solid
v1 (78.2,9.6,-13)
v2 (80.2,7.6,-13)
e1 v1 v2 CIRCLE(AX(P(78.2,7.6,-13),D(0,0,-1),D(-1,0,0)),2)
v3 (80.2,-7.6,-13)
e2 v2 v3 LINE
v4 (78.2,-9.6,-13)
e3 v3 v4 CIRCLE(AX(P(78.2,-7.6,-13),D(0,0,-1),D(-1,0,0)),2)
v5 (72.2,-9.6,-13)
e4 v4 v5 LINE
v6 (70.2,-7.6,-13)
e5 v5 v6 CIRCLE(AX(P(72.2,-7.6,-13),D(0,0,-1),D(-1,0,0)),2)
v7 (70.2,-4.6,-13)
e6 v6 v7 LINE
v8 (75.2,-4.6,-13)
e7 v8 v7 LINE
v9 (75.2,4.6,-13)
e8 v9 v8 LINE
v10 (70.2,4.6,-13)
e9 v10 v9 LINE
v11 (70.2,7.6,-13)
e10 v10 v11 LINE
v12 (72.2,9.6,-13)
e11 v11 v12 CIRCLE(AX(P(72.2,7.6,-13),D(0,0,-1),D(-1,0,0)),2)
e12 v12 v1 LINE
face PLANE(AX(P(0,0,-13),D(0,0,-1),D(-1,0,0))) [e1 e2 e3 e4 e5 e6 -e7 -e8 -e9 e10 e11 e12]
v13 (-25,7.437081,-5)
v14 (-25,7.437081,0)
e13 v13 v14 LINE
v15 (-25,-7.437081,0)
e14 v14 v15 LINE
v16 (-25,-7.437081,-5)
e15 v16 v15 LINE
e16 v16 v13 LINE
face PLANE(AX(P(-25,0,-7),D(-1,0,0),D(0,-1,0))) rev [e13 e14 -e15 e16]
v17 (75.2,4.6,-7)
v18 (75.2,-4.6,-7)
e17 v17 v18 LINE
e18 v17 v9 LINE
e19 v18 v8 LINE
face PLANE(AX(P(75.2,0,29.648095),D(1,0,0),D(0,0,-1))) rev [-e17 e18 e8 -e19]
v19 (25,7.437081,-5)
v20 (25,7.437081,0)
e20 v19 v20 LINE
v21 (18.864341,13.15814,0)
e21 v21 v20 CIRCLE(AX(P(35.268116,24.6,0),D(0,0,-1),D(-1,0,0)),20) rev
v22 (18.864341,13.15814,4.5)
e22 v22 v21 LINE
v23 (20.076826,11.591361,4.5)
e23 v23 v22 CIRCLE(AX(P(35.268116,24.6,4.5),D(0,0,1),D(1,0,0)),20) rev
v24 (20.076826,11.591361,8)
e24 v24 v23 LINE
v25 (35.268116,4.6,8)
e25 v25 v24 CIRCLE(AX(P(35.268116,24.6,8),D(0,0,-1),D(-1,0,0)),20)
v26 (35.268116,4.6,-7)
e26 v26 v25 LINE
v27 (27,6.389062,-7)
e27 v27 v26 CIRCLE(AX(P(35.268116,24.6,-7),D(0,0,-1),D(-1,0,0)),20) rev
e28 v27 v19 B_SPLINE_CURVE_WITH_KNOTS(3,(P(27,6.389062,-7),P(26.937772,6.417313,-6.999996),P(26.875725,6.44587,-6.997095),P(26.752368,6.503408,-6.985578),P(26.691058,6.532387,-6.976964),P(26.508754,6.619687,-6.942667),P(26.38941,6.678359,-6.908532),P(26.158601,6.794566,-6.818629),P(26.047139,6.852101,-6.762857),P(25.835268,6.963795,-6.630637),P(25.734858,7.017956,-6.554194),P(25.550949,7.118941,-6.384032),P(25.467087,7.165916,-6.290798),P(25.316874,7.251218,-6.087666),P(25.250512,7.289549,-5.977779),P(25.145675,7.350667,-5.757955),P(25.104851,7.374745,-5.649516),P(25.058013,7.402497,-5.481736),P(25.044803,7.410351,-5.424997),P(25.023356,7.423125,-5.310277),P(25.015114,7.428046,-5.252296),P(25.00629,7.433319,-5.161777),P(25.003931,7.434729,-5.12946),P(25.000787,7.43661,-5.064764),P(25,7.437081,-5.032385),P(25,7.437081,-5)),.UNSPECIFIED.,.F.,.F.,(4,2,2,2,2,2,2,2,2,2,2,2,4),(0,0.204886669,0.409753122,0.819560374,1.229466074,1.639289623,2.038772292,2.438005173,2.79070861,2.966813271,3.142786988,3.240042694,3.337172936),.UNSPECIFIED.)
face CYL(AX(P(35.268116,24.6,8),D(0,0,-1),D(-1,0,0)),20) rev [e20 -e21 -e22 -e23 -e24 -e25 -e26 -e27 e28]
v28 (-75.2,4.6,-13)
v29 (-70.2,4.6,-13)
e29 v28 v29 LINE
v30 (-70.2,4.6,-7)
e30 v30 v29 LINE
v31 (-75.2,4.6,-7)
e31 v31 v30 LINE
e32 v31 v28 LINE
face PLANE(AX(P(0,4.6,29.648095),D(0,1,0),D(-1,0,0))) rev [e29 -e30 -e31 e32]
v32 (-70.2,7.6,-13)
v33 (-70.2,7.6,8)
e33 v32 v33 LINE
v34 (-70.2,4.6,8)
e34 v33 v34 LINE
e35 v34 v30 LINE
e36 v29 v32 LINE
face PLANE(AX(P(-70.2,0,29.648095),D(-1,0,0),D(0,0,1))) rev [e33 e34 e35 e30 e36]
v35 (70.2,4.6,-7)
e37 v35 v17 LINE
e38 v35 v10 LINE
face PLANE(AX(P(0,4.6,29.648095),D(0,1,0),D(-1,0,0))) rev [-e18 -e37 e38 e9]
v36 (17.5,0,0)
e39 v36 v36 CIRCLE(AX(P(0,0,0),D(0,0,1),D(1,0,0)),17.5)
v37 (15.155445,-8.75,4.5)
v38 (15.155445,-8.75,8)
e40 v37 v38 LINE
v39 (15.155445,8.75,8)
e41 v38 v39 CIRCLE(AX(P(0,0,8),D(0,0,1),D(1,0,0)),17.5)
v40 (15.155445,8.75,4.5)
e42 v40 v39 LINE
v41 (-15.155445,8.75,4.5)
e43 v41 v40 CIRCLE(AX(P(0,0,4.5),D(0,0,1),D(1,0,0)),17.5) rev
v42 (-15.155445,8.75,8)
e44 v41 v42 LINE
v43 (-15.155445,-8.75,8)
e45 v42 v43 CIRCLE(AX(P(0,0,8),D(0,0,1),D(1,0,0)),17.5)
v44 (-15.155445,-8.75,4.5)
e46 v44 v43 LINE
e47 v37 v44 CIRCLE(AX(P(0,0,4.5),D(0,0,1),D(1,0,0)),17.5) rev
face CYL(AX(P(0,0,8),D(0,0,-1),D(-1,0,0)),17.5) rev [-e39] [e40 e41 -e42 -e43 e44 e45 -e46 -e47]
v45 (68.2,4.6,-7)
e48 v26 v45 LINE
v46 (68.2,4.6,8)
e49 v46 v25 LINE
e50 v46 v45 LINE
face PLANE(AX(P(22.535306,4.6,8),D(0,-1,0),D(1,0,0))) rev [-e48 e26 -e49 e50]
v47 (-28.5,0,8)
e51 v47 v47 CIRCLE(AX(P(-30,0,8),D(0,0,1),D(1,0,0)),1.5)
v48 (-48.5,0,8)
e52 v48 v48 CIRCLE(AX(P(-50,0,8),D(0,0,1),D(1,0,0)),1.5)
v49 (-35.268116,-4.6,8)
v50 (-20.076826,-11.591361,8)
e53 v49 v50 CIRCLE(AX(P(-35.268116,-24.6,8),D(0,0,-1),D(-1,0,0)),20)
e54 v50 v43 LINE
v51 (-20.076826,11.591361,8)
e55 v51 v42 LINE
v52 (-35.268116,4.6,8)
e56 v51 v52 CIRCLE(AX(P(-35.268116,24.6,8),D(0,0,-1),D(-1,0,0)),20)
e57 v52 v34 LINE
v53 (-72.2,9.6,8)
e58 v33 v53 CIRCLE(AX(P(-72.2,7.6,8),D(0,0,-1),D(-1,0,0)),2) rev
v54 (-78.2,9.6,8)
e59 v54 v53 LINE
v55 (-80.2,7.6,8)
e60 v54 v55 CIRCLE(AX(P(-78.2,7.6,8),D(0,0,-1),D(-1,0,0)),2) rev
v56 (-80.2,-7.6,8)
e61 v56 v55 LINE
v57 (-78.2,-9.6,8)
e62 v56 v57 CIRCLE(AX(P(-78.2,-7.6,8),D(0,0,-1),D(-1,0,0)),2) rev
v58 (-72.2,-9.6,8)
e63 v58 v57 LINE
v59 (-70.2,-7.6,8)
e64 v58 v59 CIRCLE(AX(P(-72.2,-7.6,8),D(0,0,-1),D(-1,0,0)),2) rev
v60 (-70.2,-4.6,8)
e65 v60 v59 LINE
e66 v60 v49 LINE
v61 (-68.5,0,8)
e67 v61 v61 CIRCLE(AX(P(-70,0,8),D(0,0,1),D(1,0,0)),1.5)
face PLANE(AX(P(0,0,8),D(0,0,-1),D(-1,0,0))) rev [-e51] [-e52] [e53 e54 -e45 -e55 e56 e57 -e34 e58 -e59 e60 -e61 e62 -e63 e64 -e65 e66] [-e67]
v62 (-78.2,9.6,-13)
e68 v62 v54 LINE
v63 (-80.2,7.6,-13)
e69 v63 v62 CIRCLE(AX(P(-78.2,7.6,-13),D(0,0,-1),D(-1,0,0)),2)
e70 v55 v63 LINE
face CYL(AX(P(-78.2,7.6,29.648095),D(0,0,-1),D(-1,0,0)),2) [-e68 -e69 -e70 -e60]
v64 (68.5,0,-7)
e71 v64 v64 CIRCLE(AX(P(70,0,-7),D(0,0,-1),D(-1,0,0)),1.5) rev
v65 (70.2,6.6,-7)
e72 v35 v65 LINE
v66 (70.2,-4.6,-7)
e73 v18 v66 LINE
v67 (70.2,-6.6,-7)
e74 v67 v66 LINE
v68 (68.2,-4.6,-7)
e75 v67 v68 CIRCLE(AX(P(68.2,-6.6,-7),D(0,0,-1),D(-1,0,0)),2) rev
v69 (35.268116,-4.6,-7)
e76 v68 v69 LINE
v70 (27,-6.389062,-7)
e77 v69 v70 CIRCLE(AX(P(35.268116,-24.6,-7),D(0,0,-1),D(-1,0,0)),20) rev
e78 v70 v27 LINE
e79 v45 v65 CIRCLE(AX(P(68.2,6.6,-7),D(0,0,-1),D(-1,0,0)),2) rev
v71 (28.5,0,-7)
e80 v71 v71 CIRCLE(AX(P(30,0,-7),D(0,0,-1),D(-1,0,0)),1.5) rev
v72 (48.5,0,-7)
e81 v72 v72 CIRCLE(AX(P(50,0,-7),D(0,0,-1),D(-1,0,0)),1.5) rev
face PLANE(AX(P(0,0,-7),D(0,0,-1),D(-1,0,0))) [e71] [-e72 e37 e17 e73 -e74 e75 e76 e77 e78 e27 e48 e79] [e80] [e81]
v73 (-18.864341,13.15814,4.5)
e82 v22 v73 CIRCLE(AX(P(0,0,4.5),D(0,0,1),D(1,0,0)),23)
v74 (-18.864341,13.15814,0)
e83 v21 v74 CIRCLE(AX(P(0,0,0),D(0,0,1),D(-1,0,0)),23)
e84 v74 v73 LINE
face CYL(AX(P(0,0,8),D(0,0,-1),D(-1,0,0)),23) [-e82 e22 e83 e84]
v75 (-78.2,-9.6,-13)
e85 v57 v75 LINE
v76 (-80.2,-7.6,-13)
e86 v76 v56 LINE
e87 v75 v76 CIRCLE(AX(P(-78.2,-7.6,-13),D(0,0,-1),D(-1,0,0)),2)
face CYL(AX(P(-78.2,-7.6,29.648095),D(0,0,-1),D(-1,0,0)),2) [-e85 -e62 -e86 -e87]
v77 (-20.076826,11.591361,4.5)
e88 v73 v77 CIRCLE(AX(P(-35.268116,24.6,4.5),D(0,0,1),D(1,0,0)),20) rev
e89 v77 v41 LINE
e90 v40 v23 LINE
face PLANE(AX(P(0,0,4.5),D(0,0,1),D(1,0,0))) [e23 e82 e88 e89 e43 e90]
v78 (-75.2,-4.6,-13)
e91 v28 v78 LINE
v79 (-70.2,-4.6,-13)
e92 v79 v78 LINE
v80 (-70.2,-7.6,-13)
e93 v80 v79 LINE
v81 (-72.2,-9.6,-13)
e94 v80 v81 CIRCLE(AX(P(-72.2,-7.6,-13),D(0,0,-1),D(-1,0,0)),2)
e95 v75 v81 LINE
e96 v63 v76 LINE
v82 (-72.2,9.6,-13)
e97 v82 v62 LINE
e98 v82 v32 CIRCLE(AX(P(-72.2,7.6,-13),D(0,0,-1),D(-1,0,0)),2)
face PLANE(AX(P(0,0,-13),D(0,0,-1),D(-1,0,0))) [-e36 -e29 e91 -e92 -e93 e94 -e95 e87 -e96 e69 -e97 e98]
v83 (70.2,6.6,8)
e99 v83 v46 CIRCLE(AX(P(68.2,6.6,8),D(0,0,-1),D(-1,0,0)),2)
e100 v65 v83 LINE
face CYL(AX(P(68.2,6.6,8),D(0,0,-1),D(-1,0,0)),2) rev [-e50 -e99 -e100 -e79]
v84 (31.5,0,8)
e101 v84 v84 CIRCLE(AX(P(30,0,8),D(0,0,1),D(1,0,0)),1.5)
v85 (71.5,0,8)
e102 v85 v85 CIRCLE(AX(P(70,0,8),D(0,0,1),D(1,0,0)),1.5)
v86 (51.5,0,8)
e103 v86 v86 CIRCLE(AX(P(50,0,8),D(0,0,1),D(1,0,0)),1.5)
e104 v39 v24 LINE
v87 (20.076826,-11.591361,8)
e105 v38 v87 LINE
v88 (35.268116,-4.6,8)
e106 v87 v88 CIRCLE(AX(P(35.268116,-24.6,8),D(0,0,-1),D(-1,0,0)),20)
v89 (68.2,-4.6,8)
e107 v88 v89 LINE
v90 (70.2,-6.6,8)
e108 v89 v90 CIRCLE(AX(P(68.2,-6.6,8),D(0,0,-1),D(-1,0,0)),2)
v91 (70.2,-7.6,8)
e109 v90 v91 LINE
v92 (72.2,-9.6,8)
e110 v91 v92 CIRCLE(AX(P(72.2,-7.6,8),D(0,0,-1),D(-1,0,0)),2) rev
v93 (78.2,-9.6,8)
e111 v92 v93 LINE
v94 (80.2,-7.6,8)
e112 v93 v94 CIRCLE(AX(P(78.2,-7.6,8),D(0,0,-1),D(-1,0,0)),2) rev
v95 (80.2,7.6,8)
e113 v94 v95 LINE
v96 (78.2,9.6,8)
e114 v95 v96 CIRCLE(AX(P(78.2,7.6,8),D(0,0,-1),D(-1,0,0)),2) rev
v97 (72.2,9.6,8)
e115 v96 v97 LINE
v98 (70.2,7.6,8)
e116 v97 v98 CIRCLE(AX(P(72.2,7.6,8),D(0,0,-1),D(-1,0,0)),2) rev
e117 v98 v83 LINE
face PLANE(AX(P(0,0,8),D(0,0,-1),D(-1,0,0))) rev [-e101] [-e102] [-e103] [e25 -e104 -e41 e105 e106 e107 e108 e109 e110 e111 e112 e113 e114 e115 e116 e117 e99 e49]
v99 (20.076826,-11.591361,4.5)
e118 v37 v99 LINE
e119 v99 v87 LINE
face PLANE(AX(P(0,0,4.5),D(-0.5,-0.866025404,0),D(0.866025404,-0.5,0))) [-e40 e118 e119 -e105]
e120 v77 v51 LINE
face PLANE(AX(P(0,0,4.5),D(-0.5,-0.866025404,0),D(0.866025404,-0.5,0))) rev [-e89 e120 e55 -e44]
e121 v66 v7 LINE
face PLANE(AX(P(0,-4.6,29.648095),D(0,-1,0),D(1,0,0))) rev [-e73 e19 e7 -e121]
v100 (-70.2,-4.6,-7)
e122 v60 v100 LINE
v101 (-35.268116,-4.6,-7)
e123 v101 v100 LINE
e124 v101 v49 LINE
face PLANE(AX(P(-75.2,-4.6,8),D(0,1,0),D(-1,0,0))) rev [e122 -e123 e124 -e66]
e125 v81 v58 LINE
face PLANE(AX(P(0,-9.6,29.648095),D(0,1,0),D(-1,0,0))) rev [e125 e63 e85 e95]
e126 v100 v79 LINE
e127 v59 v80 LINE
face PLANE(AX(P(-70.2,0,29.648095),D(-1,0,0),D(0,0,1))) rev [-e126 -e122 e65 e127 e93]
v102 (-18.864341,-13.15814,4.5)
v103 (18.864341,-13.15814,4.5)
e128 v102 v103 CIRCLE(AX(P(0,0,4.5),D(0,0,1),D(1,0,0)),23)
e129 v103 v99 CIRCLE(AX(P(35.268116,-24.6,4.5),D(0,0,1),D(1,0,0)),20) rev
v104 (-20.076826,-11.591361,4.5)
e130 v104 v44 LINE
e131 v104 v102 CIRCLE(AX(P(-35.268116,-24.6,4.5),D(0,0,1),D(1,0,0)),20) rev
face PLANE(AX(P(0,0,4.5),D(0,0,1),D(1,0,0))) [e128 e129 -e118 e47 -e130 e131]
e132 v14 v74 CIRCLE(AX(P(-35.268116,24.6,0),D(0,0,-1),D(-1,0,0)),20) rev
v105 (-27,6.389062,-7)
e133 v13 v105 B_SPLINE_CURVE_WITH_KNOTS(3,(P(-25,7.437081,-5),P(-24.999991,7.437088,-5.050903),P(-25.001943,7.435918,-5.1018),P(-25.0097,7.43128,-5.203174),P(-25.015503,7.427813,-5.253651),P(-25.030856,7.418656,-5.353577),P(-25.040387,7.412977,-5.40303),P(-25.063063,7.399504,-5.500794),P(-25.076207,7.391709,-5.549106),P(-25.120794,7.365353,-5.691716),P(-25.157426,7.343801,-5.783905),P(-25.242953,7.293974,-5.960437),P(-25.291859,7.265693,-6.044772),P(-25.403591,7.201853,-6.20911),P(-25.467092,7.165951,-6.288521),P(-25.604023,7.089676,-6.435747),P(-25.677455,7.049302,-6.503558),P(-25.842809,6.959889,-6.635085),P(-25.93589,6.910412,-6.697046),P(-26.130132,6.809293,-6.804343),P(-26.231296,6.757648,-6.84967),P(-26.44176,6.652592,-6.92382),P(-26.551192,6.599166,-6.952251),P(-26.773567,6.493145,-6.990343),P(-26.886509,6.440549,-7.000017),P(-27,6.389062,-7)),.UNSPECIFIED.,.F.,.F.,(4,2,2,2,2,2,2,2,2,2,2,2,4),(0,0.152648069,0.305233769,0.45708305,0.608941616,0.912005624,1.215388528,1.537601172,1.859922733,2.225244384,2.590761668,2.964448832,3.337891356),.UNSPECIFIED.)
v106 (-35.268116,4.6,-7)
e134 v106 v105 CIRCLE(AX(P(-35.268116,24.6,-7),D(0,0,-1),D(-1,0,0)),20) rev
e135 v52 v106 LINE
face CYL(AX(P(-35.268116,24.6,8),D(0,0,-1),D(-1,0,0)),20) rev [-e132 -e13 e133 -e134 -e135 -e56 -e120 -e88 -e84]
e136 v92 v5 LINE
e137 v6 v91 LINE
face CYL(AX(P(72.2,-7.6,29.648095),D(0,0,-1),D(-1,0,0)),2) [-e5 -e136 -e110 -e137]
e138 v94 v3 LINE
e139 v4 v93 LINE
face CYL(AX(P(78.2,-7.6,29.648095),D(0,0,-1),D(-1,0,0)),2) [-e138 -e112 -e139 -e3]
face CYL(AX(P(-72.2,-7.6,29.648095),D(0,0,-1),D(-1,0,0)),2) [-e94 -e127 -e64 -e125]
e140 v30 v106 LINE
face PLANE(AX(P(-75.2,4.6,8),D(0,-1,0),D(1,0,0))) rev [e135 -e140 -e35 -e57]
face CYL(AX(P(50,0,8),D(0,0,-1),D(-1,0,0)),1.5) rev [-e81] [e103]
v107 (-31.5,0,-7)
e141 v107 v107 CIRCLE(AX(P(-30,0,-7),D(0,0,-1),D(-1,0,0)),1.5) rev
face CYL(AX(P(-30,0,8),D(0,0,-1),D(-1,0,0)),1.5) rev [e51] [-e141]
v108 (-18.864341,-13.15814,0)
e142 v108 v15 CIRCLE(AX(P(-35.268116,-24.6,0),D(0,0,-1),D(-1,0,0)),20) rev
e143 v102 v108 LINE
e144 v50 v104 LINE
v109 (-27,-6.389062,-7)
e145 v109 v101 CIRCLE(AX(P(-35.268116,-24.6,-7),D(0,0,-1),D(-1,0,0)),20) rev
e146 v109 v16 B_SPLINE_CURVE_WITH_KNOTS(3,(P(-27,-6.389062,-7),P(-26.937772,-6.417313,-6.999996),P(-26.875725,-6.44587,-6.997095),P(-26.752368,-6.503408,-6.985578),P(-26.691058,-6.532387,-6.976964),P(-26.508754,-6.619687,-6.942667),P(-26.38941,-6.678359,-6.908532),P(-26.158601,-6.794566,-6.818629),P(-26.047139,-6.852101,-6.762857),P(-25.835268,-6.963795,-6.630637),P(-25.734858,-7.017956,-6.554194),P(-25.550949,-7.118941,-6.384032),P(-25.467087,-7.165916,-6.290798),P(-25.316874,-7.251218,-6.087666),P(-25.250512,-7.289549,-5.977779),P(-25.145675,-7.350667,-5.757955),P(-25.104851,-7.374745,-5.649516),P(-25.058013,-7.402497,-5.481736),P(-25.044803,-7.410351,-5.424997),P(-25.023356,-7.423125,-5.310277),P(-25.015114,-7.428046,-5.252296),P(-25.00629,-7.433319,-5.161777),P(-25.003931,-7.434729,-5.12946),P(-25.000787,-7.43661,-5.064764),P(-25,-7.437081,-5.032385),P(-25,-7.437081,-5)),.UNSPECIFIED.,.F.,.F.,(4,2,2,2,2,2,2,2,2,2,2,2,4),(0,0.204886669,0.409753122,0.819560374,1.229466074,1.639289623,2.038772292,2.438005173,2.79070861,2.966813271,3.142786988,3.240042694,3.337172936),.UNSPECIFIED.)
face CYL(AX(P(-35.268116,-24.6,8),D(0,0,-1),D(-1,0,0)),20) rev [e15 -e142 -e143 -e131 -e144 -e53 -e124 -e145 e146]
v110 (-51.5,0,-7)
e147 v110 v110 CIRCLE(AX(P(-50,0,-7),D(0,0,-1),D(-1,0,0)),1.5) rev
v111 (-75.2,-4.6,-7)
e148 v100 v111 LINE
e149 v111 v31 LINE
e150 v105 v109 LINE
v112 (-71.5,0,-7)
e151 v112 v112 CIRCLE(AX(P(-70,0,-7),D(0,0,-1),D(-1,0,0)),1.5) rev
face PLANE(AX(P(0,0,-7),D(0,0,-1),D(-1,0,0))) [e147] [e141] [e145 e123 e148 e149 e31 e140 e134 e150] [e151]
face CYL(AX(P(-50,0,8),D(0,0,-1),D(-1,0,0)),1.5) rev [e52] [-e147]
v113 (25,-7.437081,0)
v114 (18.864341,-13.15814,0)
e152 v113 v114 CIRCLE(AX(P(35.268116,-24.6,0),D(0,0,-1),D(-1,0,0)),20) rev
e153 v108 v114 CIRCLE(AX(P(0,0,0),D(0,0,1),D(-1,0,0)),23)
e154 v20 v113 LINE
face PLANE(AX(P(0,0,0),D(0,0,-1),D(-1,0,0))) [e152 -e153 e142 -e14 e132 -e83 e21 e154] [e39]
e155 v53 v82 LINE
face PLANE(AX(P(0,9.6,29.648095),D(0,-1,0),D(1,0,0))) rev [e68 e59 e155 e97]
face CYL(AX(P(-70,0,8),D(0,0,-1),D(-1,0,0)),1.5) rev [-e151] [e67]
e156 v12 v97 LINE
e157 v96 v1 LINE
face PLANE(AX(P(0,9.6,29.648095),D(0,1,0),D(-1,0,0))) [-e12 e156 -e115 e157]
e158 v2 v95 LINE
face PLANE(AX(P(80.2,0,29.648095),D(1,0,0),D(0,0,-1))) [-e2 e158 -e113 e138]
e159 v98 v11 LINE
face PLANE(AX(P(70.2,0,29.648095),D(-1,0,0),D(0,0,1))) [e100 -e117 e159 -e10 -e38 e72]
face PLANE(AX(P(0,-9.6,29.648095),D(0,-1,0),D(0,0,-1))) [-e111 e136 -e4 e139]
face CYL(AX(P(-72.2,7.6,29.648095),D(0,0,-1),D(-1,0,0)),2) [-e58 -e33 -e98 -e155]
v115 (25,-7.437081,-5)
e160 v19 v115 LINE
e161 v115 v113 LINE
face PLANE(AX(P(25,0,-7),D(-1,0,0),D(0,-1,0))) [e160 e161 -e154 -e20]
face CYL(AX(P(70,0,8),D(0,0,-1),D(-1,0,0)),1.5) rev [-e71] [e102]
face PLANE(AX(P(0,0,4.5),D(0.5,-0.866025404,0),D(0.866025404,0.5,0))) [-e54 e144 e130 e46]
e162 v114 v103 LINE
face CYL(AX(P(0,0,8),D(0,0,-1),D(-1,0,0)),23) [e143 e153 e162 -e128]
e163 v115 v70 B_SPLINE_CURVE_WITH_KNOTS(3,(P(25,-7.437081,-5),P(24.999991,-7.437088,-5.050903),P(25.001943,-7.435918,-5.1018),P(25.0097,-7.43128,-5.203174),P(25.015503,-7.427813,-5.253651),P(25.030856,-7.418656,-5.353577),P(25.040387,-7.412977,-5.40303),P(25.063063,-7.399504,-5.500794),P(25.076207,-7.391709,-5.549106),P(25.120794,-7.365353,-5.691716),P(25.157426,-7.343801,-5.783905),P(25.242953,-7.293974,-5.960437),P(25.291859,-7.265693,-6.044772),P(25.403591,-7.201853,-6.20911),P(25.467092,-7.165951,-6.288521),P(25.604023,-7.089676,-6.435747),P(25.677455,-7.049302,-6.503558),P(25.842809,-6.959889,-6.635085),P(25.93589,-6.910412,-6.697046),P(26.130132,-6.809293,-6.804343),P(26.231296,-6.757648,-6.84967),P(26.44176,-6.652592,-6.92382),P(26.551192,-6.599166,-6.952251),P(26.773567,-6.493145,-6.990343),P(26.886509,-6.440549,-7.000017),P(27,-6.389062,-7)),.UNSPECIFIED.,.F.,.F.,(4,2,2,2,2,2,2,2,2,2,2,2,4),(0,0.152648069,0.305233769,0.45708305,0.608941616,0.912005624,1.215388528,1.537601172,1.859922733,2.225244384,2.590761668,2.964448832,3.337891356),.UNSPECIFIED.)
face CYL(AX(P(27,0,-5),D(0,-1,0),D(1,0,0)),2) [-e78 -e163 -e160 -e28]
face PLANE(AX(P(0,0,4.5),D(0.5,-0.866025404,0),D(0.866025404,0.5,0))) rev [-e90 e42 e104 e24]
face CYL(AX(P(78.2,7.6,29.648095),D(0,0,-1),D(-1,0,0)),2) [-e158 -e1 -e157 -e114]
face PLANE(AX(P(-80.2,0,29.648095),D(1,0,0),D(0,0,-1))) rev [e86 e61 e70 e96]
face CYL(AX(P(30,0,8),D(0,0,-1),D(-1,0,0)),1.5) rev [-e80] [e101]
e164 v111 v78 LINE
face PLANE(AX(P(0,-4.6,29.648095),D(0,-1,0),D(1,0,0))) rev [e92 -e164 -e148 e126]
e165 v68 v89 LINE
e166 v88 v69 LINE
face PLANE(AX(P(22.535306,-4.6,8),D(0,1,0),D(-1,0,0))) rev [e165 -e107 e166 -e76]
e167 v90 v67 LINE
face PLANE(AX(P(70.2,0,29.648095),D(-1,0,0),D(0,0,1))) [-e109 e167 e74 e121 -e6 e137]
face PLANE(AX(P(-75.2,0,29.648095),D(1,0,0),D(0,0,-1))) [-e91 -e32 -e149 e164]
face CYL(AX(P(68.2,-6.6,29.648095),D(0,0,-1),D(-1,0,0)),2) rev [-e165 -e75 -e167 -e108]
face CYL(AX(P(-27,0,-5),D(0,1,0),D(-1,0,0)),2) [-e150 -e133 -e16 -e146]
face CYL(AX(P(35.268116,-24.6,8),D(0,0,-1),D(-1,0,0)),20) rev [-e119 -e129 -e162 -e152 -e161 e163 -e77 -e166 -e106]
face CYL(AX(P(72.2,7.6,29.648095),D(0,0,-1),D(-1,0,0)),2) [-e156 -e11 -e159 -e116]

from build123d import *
from build123d.topology import SkipClean

# Parameters (mm, degrees)
SKETCH_1_R                  = 17.500000000000004
SKETCH_1_R_2                = 1.4999999999999971
SKETCH_1_R_3                = 1.4999999999999967
SKETCH_1_R_4                = 1.499999999999997
EXTRUDE_1_DEPTH             = 8
CUT_EXTRUDE_START           = -3.5
CUT_EXTRUDE_1_DEPTH         = 3.5
FILLET_1_R                  = 20
EXTRUDE_START               = 7
SKETCH_3_R                  = 1.499999999999997
SKETCH_3_R_2                = 1.4999999999999967
SKETCH_3_R_3                = 1.4999999999999971
EXTRUDE_2_DEPTH             = 7
EXTRUDE_3_DEPTH             = 6
EXTRUDE_3_DIRECTION_2_REACH = 82.056
FILLET_2_R                  = 2


with BuildPart() as part:
    # Sketch 1 → 凸台-拉伸1 (new body)
    with BuildSketch(Plane.XY):
        with BuildLine():
            Line((22.535305633605237, 4.6), (75.19999999999999, 4.599999999999999))
            Line((75.19999999999999, 4.599999999999999), (75.19999999999999, -4.6000000000000005))
            Line((75.19999999999999, -4.6000000000000005), (22.535305633605237, -4.6))
            ThreePointArc((22.535305633605237, -4.6), (1.41e-15, -23), (-22.535305633605237, -4.6))
            Line((-22.535305633605237, -4.6), (-75.19999999999999, -4.6000000000000005))
            Line((-75.19999999999999, -4.6000000000000005), (-75.19999999999999, 4.599999999999999))
            Line((-75.19999999999999, 4.599999999999999), (-22.535305633605237, 4.6))
            ThreePointArc((-22.535305633605237, 4.6), (1.41e-15, 23), (22.535305633605237, 4.6))
        make_face()
        Circle(SKETCH_1_R, mode=Mode.SUBTRACT)
        with Locations((-69.99999999999999, 0)):
            Circle(SKETCH_1_R_2, mode=Mode.SUBTRACT)
        with Locations((-49.999999999999986, 0)):
            Circle(SKETCH_1_R_3, mode=Mode.SUBTRACT)
        with Locations((-29.999999999999986, 0)):
            Circle(SKETCH_1_R_4, mode=Mode.SUBTRACT)
        with Locations((30.00000000000003, 0)):
            Circle(SKETCH_1_R_3, mode=Mode.SUBTRACT)
        with Locations((50.00000000000003, 0)):
            Circle(SKETCH_1_R_3, mode=Mode.SUBTRACT)
        with Locations((70.00000000000001, 0)):
            Circle(SKETCH_1_R_2, mode=Mode.SUBTRACT)
    extrude(amount=EXTRUDE_1_DEPTH)

    # 草图2 → 切除-拉伸1 (cut)
    with BuildSketch(Plane.XY.offset(8).offset(CUT_EXTRUDE_START)):
        with BuildLine():
            ThreePointArc((19.918584287042115, 11.499999999999945), (8.9e-16, 23), (-19.91858428704211, 11.499999999999947))
            Line((-19.918584287042115, 11.499999999999943), (-15.155444566227704, 8.749999999999961))
            ThreePointArc((-15.15544456622793, 8.74999999999957), (1.07e-15, 17.500000000000004), (15.15544456622793, 8.749999999999568))
            Line((15.155444566227706, 8.749999999999966), (19.918584287042123, 11.499999999999952))
        make_face()
        with BuildLine():
            ThreePointArc((15.155444566227922, -8.749999999999579), (-3.21e-15, -17.500000000000004), (-15.155444566227935, -8.74999999999956))
            Line((-15.155444566227704, -8.749999999999961), (-19.918584287042123, -11.499999999999947))
            ThreePointArc((-19.918584287042123, -11.499999999999943), (-2.66e-15, -23), (19.918584287042115, -11.49999999999995))
            Line((19.918584287042123, -11.499999999999952), (15.155444566227702, -8.749999999999964))
        make_face()
    extrude(amount=CUT_EXTRUDE_1_DEPTH, mode=Mode.SUBTRACT)

    # 圆角1
    fillet_1_edges = [part.edges().sort_by_distance(p)[0] for p in [
        (-22.53530563360524, -4.600000000000001, 4),
        (-22.53530563360524, 4.6, 4),
        (22.53530563360524, -4.6, 4),
        (22.53530563360524, 4.600000000000001, 4),
    ]]
    fillet(fillet_1_edges, radius=FILLET_1_R)

    # 草图3 → 凸台-拉伸2 (add)
    # profile 1 of 2: a face of its own
    with SkipClean():  # the faces are left unmerged after this step: merging them gives an invalid solid
        with BuildSketch(Plane(origin=(0, 0, 0), x_dir=(-1, 0, 0), z_dir=(0, 0, -1)).offset(EXTRUDE_START)):
            with BuildLine():
                ThreePointArc((35.26811591225139, 4.599999999999994), (29.94169047325186, 5.3223136231865595), (25.00000000000001, 7.437080795722139))
                Line((25.000000000000014, 7.437080795722148), (25.000000000000007, -7.437080795722132))
                ThreePointArc((25.00000000000001, -7.437080795722135), (29.94169047325186, -5.3223136231865595), (35.26811591225139, -4.600000000000005))
                Line((35.26811591225139, -4.600000000000003), (75.19999999999999, -4.6000000000000005))
                Line((75.19999999999999, -4.6000000000000005), (75.19999999999999, 4.599999999999999))
                Line((75.19999999999999, 4.599999999999999), (35.26811591225139, 4.6))
            make_face()
            with Locations((29.999999999999986, 0)):
                Circle(SKETCH_3_R, mode=Mode.SUBTRACT)
            with Locations((49.999999999999986, 0)):
                Circle(SKETCH_3_R_2, mode=Mode.SUBTRACT)
            with Locations((69.99999999999999, 0)):
                Circle(SKETCH_3_R_3, mode=Mode.SUBTRACT)
        # profile 2 of 2: a face of its own
        with BuildSketch(Plane(origin=(0, 0, 0), x_dir=(-1, 0, 0), z_dir=(0, 0, -1)).offset(EXTRUDE_START)):
            with BuildLine():
                Line((-25, -7.437080795722138), (-25.000000000000007, 7.437080795722141))
                ThreePointArc((-25.000000000000004, 7.437080795722139), (-29.94169047325186, 5.322313623186556), (-35.268115912251396, 4.600000000000001))
                Line((-35.268115912251396, 4.600000000000003), (-75.19999999999999, 4.599999999999999))
                Line((-75.19999999999999, 4.599999999999999), (-75.19999999999999, -4.6000000000000005))
                Line((-75.19999999999999, -4.6000000000000005), (-35.26811591225139, -4.6))
                ThreePointArc((-35.26811591225139, -4.600000000000001), (-29.941690473251857, -5.3223136231865595), (-25.000000000000004, -7.437080795722142))
            make_face()
            with Locations((-70.00000000000001, 0)):
                Circle(SKETCH_3_R_3, mode=Mode.SUBTRACT)
            with Locations((-50.00000000000003, 0)):
                Circle(SKETCH_3_R_2, mode=Mode.SUBTRACT)
            with Locations((-30.00000000000003, 0)):
                Circle(SKETCH_3_R_2, mode=Mode.SUBTRACT)
        extrude(amount=-EXTRUDE_2_DEPTH)

    # 草图4 → 凸台-拉伸3 (add)
    with SkipClean():  # the faces are left unmerged after this step: merging them gives an invalid solid
        with BuildSketch(Plane(origin=(0, 0, -7), x_dir=(-1, 0, 0), z_dir=(0, 0, -1))):
            Polygon((-75.19999999999999, 4.599999999999999), (-70.19999999999999, 4.599999999999999), (-70.19999999999999, 9.599999999999994), (-80.19999999999999, 9.59999999999999), (-80.19999999999999, -9.600000000000001), (-70.19999999999999, -9.600000000000001), (-70.19999999999999, -4.6), (-75.19999999999999, -4.6000000000000005), align=None)
            Polygon((70.19999999999999, -4.599999999999983), (70.19999999999999, -9.599999999999984), (80.19999999999999, -9.599999999999982), (80.19999999999999, 9.60000000000001), (70.19999999999999, 9.600000000000012), (70.19999999999999, 4.600000000000011), (75.19999999999999, 4.599999999999999), (75.19999999999999, -4.599999999999982), align=None)
        extrude(amount=EXTRUDE_3_DEPTH)

    # 凸台-拉伸3 direction 2: up to this face of the body (flat: up to its plane)
    extrude_3_direction_2_end = Plane(part.part.faces().sort_by_distance((41.665657834, 0, 8))[0])
    # 草图4 → 凸台-拉伸3 direction 2 (add, up to the picked face)
    with BuildSketch(Plane(origin=(0, 0, -7), x_dir=(-1, 0, 0), z_dir=(0, 0, -1)), mode=Mode.PRIVATE) as extrude_3_direction_2_sk1:
        Polygon((-75.19999999999999, 4.599999999999999), (-70.19999999999999, 4.599999999999999), (-70.19999999999999, 9.599999999999994), (-80.19999999999999, 9.59999999999999), (-80.19999999999999, -9.600000000000001), (-70.19999999999999, -9.600000000000001), (-70.19999999999999, -4.6), (-75.19999999999999, -4.6000000000000005), align=None)
    extrude_3_direction_2_tool1 = split(extrude(extrude_3_direction_2_sk1.sketch, amount=-EXTRUDE_3_DIRECTION_2_REACH, mode=Mode.PRIVATE), bisect_by=extrude_3_direction_2_end, keep=Keep.BOTH, mode=Mode.PRIVATE)
    # 草图4 → 凸台-拉伸3 direction 2 (add, up to the picked face)
    with BuildSketch(Plane(origin=(0, 0, -7), x_dir=(-1, 0, 0), z_dir=(0, 0, -1)), mode=Mode.PRIVATE) as extrude_3_direction_2_sk2:
        Polygon((70.19999999999999, -4.599999999999983), (70.19999999999999, -9.599999999999984), (80.19999999999999, -9.599999999999982), (80.19999999999999, 9.60000000000001), (70.19999999999999, 9.600000000000012), (70.19999999999999, 4.600000000000011), (75.19999999999999, 4.599999999999999), (75.19999999999999, -4.599999999999982), align=None)
    extrude_3_direction_2_tool2 = split(extrude(extrude_3_direction_2_sk2.sketch, amount=-EXTRUDE_3_DIRECTION_2_REACH, mode=Mode.PRIVATE), bisect_by=extrude_3_direction_2_end, keep=Keep.BOTH, mode=Mode.PRIVATE)
    add(extrude_3_direction_2_tool1.solids().sort_by(Axis((75.987671, 0, -7), (0, 0, 1)))[0])
    add(extrude_3_direction_2_tool2.solids().sort_by(Axis((-75.987671, 0, -7), (0, 0, 1)))[0])

    # 圆角2
    # the kernel refuses this fillet: 2 mm, written as the material it adds along each edge
    with BuildSketch(Plane(origin=(70.19999999999999, 4.599999999999996, 0), x_dir=(-1, 1.33e-15, 0), z_dir=(0, 0, 1))) as fillet_2_piece_1:
        with BuildLine():
            CenterArc((FILLET_2_R, -FILLET_2_R), FILLET_2_R, 90.00000000000007, 89.99999999999993)
            Line((2.66e-15, -FILLET_2_R), (0, 0))
            Line((0, 0), (FILLET_2_R, 0))
        make_face()
    extrude(amount=8)
    with BuildSketch(Plane(origin=(70.19999999999999, -4.6, 0), x_dir=(-1, -4.4e-16, 0), z_dir=(0, 0, 1))) as fillet_2_piece_2:
        with BuildLine():
            CenterArc((FILLET_2_R, FILLET_2_R), FILLET_2_R, 180, 90)
            Line((8.9e-16, FILLET_2_R), (0, 0))
            Line((0, 0), (FILLET_2_R, 0))
        make_face()
    extrude(amount=8)
    with BuildSketch(Plane(origin=(70.19999999999999, -4.6, -7), x_dir=(-1, -4.4e-16, 0), z_dir=(0, 0, 1))) as fillet_2_piece_3:
        with BuildLine():
            CenterArc((FILLET_2_R, FILLET_2_R), FILLET_2_R, 180, 90)
            Line((8.9e-16, FILLET_2_R), (0, 0))
            Line((0, 0), (FILLET_2_R, 0))
        make_face()
    extrude(amount=7)
    with BuildSketch(Plane(origin=(70.19999999999999, 4.599999999999996, -7), x_dir=(-1, 1.78e-15, 0), z_dir=(0, 0, 1))) as fillet_2_piece_4:
        with BuildLine():
            CenterArc((FILLET_2_R, -FILLET_2_R), FILLET_2_R, 90.0000000000001, 89.9999999999999)
            Line((3.55e-15, -FILLET_2_R), (0, 0))
            Line((0, 0), (FILLET_2_R, 0))
        make_face()
    extrude(amount=7)
    # the kernel refuses this fillet: 2 mm, written as the material it takes off along each edge
    with BuildSketch(Plane(origin=(24.999999999999996, -12.437080795722139, -7), x_dir=(1, -4.8e-16, 0), z_dir=(4.8e-16, 1, 0))) as fillet_2_2_piece_1:
        with BuildLine():
            CenterArc((FILLET_2_R, -FILLET_2_R), FILLET_2_R, 90, 90)
            Line((0, -FILLET_2_R), (0, 0))
            Line((0, 0), (FILLET_2_R, 0))
        make_face()
    extrude(amount=24.87416159144428, mode=Mode.SUBTRACT)
    with BuildSketch(Plane(origin=(-25.000000000000018, 12.437080795722148, -7), x_dir=(0, 0, 1), z_dir=(4.8e-16, -1, 0))) as fillet_2_2_piece_2:
        with BuildLine():
            CenterArc((FILLET_2_R, FILLET_2_R), FILLET_2_R, 180, 90)
            Line((0, FILLET_2_R), (0, 0))
            Line((0, 0), (FILLET_2_R, 0))
        make_face()
    extrude(amount=24.87416159144428, mode=Mode.SUBTRACT)
    with BuildSketch(Plane(origin=(70.19999999999999, -9.600000000000001, -7), x_dir=(1, 0, 0), z_dir=(0, 0, 1)), Plane(origin=(-70.19999999999999, 9.600000000000012, -7), x_dir=(-1, 0, 0), z_dir=(0, 0, 1))) as fillet_2_2_piece_3:
        with BuildLine():
            CenterArc((FILLET_2_R, FILLET_2_R), FILLET_2_R, 180, 90)
            Line((0, FILLET_2_R), (0, 0))
            Line((0, 0), (FILLET_2_R, 0))
        make_face()
    extrude(amount=20, mode=Mode.SUBTRACT)
    with BuildSketch(Plane(origin=(80.19999999999999, -9.600000000000001, -7), x_dir=(0, 1, 0), z_dir=(0, 0, 1)), Plane(origin=(-70.19999999999999, -9.599999999999984, -7), x_dir=(0, 1, 0), z_dir=(0, 0, 1))) as fillet_2_2_piece_4:
        with BuildLine():
            CenterArc((FILLET_2_R, FILLET_2_R), FILLET_2_R, 180, 90)
            Line((0, FILLET_2_R), (0, 0))
            Line((0, 0), (FILLET_2_R, 0))
        make_face()
    extrude(amount=20, mode=Mode.SUBTRACT)
    with BuildSketch(Plane(origin=(80.19999999999999, 9.59999999999999, -7), x_dir=(-1, 0, 0), z_dir=(0, 0, 1)), Plane(origin=(-80.19999999999999, -9.599999999999982, -7), x_dir=(1, 0, 0), z_dir=(0, 0, 1))) as fillet_2_2_piece_5:
        with BuildLine():
            CenterArc((FILLET_2_R, FILLET_2_R), FILLET_2_R, 180.00000000000003, 90)
            Line((0, FILLET_2_R), (0, 0))
            Line((0, 0), (FILLET_2_R, 0))
        make_face()
    extrude(amount=20, mode=Mode.SUBTRACT)
    with BuildSketch(Plane(origin=(70.19999999999999, 9.599999999999994, -7), x_dir=(0, -1, 0), z_dir=(0, 0, 1))) as fillet_2_2_piece_6:
        with BuildLine():
            CenterArc((FILLET_2_R, FILLET_2_R), FILLET_2_R, 180, 90)
            Line((0, FILLET_2_R), (0, 0))
            Line((0, 0), (FILLET_2_R, 0))
        make_face()
    extrude(amount=20.000000000000004, mode=Mode.SUBTRACT)
    with BuildSketch(Plane(origin=(-80.19999999999999, 9.60000000000001, -7), x_dir=(0, -1, 0), z_dir=(0, 0, 1))) as fillet_2_2_piece_7:
        with BuildLine():
            CenterArc((FILLET_2_R, FILLET_2_R), FILLET_2_R, 180, 90)
            Line((0, FILLET_2_R), (0, 0))
            Line((0, 0), (FILLET_2_R, 0))
        make_face()
    extrude(amount=20, mode=Mode.SUBTRACT)
    with BuildSketch(Plane(origin=(-70.19999999999999, -9.599999999999984, -7), x_dir=(0, 1, 0), z_dir=(0, 0, -1)), Plane(origin=(80.19999999999999, -9.600000000000001, -7), x_dir=(0, 1, 0), z_dir=(0, 0, -1))) as fillet_2_2_piece_8:
        with BuildLine():
            CenterArc((FILLET_2_R, -FILLET_2_R), FILLET_2_R, 90, 90)
            Line((0, -FILLET_2_R), (0, 0))
            Line((0, 0), (FILLET_2_R, 0))
        make_face()
    extrude(amount=11, mode=Mode.SUBTRACT)
    with BuildSketch(Plane(origin=(-80.19999999999999, -9.599999999999982, -7), x_dir=(1, 0, 0), z_dir=(0, 0, -1)), Plane(origin=(80.19999999999999, 9.59999999999999, -7), x_dir=(-1, 0, 0), z_dir=(0, 0, -1))) as fillet_2_2_piece_9:
        with BuildLine():
            CenterArc((FILLET_2_R, -FILLET_2_R), FILLET_2_R, 90, 89.99999999999997)
            Line((0, -FILLET_2_R), (0, 0))
            Line((0, 0), (FILLET_2_R, 0))
        make_face()
    extrude(amount=11, mode=Mode.SUBTRACT)
    with BuildSketch(Plane(origin=(-80.19999999999999, 9.60000000000001, -7), x_dir=(0, -1, 0), z_dir=(0, 0, -1))) as fillet_2_2_piece_10:
        with BuildLine():
            CenterArc((FILLET_2_R, -FILLET_2_R), FILLET_2_R, 90, 90)
            Line((0, -FILLET_2_R), (0, 0))
            Line((0, 0), (FILLET_2_R, 0))
        make_face()
    extrude(amount=11, mode=Mode.SUBTRACT)
    with BuildSketch(Plane(origin=(-70.19999999999999, 9.600000000000012, -7), x_dir=(-1, 0, 0), z_dir=(0, 0, -1))) as fillet_2_2_piece_11:
        with BuildLine():
            CenterArc((FILLET_2_R, -FILLET_2_R), FILLET_2_R, 90, 90)
            Line((0, -FILLET_2_R), (0, 0))
            Line((0, 0), (FILLET_2_R, 0))
        make_face()
    extrude(amount=11, mode=Mode.SUBTRACT)
    with BuildSketch(Plane(origin=(70.19999999999999, 9.599999999999994, -7), x_dir=(0, -1, 0), z_dir=(0, 0, -1))) as fillet_2_2_piece_12:
        with BuildLine():
            CenterArc((FILLET_2_R, -FILLET_2_R), FILLET_2_R, 90, 90)
            Line((0, -FILLET_2_R), (0, 0))
            Line((0, 0), (FILLET_2_R, 0))
        make_face()
    extrude(amount=11, mode=Mode.SUBTRACT)
    with BuildSketch(Plane(origin=(70.19999999999999, -9.600000000000001, -7), x_dir=(0, 1, 0), z_dir=(0, 0, -1))) as fillet_2_2_piece_13:
        with BuildLine():
            CenterArc((FILLET_2_R, FILLET_2_R), FILLET_2_R, 180, 90)
            Line((0, FILLET_2_R), (0, 0))
            Line((0, 0), (FILLET_2_R, 0))
        make_face()
    extrude(amount=11, mode=Mode.SUBTRACT)


solid = part.part
